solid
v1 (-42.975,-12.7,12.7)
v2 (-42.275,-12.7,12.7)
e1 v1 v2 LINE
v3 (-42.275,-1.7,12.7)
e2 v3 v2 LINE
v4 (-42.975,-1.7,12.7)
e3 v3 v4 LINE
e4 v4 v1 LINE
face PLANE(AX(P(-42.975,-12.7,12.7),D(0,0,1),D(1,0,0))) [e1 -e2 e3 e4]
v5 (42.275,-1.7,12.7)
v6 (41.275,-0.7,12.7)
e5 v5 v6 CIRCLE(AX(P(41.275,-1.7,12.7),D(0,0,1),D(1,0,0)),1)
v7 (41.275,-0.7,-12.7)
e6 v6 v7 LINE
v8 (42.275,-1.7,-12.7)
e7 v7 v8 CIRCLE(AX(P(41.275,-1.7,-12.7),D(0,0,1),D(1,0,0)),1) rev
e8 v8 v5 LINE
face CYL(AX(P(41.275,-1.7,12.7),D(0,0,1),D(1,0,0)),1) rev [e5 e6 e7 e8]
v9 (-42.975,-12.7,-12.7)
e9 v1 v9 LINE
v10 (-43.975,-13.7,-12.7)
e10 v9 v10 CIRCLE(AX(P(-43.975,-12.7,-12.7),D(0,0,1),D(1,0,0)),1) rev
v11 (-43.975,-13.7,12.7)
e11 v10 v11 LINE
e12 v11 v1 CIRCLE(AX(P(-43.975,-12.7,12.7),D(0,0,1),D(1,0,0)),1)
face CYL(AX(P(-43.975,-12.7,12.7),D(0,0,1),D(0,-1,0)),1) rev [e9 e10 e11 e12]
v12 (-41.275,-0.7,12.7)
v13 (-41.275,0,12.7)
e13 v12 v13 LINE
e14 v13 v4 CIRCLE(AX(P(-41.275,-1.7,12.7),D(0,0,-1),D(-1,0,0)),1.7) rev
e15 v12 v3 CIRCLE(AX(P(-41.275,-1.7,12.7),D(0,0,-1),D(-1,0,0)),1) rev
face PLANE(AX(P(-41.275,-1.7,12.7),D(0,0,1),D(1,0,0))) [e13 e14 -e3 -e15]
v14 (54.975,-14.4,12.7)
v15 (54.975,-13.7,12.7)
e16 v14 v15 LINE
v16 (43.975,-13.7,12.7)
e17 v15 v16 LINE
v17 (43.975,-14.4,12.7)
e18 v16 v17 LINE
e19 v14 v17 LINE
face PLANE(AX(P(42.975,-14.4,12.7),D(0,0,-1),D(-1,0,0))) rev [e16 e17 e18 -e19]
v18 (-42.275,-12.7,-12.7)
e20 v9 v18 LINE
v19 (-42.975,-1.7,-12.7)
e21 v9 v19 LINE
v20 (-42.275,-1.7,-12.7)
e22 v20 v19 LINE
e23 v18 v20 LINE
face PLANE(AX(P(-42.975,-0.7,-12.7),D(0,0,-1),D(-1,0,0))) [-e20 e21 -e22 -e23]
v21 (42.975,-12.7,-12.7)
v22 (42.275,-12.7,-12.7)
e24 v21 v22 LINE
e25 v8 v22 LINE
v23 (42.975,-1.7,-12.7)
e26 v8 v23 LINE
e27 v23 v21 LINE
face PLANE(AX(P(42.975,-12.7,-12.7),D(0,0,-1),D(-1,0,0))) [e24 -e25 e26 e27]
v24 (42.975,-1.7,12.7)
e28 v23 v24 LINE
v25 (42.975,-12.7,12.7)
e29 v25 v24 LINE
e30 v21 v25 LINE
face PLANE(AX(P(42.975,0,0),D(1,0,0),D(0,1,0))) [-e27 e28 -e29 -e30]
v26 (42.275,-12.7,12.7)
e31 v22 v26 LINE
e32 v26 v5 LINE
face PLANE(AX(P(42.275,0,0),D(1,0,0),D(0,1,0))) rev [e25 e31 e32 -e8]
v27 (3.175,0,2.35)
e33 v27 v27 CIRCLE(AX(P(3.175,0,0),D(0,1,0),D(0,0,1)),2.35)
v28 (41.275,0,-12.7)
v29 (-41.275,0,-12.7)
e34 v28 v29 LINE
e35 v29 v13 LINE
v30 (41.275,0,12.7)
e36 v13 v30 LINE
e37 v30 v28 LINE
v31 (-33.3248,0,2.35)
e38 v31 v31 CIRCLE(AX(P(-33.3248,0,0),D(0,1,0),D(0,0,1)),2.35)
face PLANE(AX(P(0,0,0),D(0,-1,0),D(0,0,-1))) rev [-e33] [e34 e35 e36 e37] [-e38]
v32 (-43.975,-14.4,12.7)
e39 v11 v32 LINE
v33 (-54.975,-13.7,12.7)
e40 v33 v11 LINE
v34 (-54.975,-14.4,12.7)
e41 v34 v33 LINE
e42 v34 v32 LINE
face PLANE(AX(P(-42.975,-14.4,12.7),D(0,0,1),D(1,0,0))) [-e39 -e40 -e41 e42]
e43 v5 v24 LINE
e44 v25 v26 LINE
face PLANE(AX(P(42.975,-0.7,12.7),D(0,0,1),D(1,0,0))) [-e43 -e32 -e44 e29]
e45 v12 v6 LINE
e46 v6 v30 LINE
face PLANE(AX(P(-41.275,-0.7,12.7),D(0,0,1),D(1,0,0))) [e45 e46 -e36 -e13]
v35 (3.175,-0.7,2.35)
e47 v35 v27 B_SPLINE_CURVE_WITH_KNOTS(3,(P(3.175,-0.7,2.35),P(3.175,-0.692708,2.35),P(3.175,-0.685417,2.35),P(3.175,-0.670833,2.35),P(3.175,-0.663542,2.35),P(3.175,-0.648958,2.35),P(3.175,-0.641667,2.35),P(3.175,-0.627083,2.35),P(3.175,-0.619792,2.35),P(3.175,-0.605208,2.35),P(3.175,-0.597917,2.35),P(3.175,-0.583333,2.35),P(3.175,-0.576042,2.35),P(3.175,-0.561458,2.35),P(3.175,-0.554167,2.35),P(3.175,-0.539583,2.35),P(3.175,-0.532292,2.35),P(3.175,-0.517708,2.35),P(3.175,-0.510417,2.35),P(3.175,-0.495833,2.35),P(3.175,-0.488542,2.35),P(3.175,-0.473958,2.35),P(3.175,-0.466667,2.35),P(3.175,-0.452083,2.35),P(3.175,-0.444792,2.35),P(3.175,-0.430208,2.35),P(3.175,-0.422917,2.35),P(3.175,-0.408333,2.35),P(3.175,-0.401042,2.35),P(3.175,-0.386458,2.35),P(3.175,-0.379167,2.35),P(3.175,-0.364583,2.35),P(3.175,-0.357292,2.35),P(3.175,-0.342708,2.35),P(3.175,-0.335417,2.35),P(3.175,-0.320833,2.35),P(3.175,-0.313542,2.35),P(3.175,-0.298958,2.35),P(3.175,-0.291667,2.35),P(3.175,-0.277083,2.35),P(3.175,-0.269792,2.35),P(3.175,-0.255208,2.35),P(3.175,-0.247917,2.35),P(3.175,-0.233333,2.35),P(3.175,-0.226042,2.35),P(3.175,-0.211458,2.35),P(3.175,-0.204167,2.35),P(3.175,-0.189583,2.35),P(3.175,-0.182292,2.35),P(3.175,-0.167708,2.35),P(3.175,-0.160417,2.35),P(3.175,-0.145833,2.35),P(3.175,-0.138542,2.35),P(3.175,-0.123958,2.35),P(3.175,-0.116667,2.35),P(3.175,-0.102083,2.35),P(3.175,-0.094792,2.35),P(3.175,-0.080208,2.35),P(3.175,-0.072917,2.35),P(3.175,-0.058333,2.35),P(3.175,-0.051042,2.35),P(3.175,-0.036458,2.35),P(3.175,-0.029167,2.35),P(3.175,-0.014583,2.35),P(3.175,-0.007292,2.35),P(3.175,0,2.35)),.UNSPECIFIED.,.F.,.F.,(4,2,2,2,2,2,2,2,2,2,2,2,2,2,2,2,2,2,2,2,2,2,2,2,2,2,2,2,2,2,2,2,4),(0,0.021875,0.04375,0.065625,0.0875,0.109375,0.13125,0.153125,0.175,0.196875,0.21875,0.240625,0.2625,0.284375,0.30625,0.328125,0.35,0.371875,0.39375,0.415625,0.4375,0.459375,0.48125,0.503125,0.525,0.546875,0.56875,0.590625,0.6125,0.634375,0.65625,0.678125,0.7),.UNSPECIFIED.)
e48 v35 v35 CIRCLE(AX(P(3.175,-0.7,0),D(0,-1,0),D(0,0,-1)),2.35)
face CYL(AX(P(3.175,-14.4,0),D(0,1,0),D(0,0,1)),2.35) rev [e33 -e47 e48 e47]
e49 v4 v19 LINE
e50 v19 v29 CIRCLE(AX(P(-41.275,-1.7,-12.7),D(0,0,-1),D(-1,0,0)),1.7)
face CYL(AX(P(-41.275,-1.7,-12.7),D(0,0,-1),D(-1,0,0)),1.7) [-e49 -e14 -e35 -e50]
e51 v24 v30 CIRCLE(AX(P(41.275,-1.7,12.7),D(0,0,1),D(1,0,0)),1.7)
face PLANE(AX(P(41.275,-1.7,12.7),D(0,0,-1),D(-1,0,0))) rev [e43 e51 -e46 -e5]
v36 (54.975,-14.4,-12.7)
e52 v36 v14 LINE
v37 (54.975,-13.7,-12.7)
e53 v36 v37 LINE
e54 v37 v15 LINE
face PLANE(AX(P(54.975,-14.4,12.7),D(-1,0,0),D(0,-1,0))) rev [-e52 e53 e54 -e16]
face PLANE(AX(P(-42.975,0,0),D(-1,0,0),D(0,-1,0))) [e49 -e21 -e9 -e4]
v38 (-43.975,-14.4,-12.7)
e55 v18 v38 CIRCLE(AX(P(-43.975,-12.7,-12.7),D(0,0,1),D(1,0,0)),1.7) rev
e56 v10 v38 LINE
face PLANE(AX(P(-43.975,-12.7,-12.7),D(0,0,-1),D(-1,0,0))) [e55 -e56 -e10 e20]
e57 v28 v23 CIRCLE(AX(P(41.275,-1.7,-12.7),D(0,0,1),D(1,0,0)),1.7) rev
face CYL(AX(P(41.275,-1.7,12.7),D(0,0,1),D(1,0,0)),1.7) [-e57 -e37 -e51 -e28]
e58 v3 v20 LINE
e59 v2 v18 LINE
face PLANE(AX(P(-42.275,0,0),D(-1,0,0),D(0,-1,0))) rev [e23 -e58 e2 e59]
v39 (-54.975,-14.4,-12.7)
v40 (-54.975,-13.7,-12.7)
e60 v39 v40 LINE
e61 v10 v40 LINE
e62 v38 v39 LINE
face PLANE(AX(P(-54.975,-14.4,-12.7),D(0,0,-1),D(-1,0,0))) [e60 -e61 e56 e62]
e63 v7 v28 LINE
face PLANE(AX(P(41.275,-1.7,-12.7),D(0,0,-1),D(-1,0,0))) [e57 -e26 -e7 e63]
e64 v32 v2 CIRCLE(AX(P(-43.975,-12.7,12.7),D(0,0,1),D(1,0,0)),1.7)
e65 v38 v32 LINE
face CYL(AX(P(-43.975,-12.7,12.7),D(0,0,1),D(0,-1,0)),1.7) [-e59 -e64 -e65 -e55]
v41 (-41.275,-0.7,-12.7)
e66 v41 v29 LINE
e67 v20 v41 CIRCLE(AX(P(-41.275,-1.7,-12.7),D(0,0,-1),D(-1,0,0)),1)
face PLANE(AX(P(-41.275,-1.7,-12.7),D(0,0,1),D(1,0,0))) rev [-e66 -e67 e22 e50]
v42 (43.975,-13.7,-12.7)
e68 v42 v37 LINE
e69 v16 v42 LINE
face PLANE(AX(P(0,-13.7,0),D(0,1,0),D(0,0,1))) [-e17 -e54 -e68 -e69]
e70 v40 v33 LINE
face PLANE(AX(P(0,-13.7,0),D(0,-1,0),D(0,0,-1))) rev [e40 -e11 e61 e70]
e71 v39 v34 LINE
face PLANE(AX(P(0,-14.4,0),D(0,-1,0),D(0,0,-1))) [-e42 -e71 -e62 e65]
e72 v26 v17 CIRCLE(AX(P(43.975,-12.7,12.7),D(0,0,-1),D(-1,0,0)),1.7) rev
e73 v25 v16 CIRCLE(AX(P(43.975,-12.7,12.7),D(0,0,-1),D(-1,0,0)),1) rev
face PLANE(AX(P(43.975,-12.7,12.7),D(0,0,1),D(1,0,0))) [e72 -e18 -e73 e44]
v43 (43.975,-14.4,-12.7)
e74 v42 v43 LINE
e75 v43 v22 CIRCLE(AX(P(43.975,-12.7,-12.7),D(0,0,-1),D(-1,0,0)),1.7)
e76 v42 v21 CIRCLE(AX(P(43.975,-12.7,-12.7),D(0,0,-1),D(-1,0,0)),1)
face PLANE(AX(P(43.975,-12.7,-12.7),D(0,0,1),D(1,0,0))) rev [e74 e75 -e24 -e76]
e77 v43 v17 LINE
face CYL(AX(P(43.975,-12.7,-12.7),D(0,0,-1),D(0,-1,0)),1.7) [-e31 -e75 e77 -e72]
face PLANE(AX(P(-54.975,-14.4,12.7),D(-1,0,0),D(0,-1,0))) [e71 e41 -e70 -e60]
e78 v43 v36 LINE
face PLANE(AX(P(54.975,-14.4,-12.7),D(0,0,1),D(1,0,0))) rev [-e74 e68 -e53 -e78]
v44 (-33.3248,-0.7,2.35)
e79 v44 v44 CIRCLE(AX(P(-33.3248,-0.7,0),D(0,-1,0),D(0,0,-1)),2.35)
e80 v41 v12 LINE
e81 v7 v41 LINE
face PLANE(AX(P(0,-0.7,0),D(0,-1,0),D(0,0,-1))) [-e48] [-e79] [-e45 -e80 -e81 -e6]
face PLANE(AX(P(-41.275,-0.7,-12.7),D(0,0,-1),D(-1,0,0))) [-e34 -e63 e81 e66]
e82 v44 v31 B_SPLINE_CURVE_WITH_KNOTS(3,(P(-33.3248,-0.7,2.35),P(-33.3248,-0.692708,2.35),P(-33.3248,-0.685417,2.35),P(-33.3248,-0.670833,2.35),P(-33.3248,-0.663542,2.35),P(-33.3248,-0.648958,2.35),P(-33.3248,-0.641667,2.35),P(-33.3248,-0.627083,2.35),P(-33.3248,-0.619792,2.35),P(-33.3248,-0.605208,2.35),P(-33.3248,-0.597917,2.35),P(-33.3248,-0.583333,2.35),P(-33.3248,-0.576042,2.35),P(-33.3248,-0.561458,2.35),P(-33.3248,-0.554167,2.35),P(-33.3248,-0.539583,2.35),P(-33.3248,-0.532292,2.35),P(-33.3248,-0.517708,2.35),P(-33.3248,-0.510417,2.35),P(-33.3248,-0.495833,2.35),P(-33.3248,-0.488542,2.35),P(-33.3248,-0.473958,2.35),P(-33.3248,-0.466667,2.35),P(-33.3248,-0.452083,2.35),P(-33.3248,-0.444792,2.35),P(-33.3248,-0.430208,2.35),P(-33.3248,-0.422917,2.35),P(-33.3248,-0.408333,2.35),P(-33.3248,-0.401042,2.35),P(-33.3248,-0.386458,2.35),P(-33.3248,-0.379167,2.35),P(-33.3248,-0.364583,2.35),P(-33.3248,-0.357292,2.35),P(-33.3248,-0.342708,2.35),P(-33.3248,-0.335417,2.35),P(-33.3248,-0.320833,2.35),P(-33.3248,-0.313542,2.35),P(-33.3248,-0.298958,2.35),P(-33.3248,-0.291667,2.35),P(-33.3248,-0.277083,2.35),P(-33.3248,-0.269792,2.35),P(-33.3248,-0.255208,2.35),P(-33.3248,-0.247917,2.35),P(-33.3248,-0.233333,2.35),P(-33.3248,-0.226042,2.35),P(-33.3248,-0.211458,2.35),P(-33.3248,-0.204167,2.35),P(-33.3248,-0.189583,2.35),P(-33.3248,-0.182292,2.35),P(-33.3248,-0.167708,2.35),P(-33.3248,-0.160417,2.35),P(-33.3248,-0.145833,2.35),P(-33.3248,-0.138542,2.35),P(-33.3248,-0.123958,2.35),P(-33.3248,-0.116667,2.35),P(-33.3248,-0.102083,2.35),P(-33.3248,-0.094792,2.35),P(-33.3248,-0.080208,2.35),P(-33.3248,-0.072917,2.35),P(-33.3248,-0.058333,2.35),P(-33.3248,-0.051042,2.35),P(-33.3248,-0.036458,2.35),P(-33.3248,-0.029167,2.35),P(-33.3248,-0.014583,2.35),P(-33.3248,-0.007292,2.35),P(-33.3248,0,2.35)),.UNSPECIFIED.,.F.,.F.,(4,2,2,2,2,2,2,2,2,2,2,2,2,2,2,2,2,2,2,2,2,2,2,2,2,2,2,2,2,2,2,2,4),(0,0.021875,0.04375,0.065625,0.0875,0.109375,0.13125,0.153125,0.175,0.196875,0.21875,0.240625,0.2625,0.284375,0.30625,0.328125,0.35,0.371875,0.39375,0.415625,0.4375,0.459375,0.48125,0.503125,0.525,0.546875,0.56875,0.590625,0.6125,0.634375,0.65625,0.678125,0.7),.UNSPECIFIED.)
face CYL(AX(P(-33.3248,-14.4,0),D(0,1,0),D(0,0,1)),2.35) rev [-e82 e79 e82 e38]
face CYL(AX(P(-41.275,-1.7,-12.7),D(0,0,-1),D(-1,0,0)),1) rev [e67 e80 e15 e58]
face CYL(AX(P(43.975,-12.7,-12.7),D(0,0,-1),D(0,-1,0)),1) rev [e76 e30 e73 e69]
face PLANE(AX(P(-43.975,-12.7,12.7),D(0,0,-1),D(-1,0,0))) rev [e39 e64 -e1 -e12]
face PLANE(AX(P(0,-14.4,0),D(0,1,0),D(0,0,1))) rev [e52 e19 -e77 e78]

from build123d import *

# Parameters (mm, degrees)
SKETCH1_W          = 82.55
SKETCH1_H          = 25.4
BASE_FLANGE1_DEPTH = 0.7
EDGE_FLANGE1_DEPTH = 25.4
EDGE_FLANGE2_DEPTH = 25.4
EDGE_FLANGE3_DEPTH = 25.4
EDGE_FLANGE4_DEPTH = 25.4
SKETCH19_R         = 2.35
CUT_EXTRUDE1_DEPTH = 59.231440176


# Sheet-metal steps are written as plain solids
with BuildPart() as part:
    # Sketch1 → Base-Flange1 (new body)
    with BuildSketch(Plane(origin=(0, 0, 0), x_dir=(1, 0, 0), z_dir=(0, 1, 0))):
        Rectangle(SKETCH1_W, SKETCH1_H)
    extrude(amount=-BASE_FLANGE1_DEPTH)

    # Edge-Flange1 section (across the edge) → Edge-Flange1 (add)
    with BuildSketch(Plane(origin=(42.275, -0.7, -12.7), x_dir=(-1, 0, 0), z_dir=(0, 0, 1))):
        with BuildLine():
            Line((-0.7, 1), (-0.7, 12))
            Line((-0.7, 12), (0, 12))
            Line((0, 12), (0, 1))
            ThreePointArc((0, 1), (0.292893219, 0.292893219), (1, 0))
            Line((1, 0), (1, -0.7))
            ThreePointArc((1, -0.7), (-0.202081528, -0.202081528), (-0.7, 1))
        make_face()
    extrude(amount=EDGE_FLANGE1_DEPTH)

    # Edge-Flange2 section (across the edge) → Edge-Flange2 (add)
    with BuildSketch(Plane(origin=(42.975, -13.7, 12.7), x_dir=(0, 1, 0), z_dir=(0, 0, -1))):
        with BuildLine():
            Line((-0.7, 1), (-0.7, 12))
            Line((-0.7, 12), (0, 12))
            Line((0, 12), (0, 1))
            ThreePointArc((0, 1), (0.292893219, 0.292893219), (1, 0))
            Line((1, 0), (1, -0.7))
            ThreePointArc((1, -0.7), (-0.202081528, -0.202081528), (-0.7, 1))
        make_face()
    extrude(amount=EDGE_FLANGE2_DEPTH)

    # Edge-Flange3 section (across the edge) → Edge-Flange3 (add)
    with BuildSketch(Plane(origin=(-42.275, -0.7, 12.7), x_dir=(1, 0, 0), z_dir=(0, 0, -1))):
        with BuildLine():
            Line((-0.7, 1), (-0.7, 12))
            Line((-0.7, 12), (0, 12))
            Line((0, 12), (0, 1))
            ThreePointArc((0, 1), (0.292893219, 0.292893219), (1, 0))
            Line((1, 0), (1, -0.7))
            ThreePointArc((1, -0.7), (-0.202081528, -0.202081528), (-0.7, 1))
        make_face()
    extrude(amount=EDGE_FLANGE3_DEPTH)

    # Edge-Flange4 section (across the edge) → Edge-Flange4 (add)
    with BuildSketch(Plane(origin=(-42.975, -13.7, -12.7), x_dir=(0, 1, 0), z_dir=(0, 0, 1))):
        with BuildLine():
            Line((-0.7, 1), (-0.7, 12))
            Line((-0.7, 12), (0, 12))
            Line((0, 12), (0, 1))
            ThreePointArc((0, 1), (0.292893219, 0.292893219), (1, 0))
            Line((1, 0), (1, -0.7))
            ThreePointArc((1, -0.7), (-0.202081528, -0.202081528), (-0.7, 1))
        make_face()
    extrude(amount=EDGE_FLANGE4_DEPTH)

    # Sketch19 → Cut-Extrude1 (cut, through all)
    with BuildSketch(Plane(origin=(0, 0, 0), x_dir=(1, 0, 0), z_dir=(0, 1, 0))):
        with Locations(Location((-33.3248, 0, 0), (0, 0, 270))):
            Circle(SKETCH19_R)
        with Locations(Location((3.175, 0, 0), (0, 0, 270))):
            Circle(SKETCH19_R)
    extrude(amount=-CUT_EXTRUDE1_DEPTH, mode=Mode.SUBTRACT)


solid = part.part
